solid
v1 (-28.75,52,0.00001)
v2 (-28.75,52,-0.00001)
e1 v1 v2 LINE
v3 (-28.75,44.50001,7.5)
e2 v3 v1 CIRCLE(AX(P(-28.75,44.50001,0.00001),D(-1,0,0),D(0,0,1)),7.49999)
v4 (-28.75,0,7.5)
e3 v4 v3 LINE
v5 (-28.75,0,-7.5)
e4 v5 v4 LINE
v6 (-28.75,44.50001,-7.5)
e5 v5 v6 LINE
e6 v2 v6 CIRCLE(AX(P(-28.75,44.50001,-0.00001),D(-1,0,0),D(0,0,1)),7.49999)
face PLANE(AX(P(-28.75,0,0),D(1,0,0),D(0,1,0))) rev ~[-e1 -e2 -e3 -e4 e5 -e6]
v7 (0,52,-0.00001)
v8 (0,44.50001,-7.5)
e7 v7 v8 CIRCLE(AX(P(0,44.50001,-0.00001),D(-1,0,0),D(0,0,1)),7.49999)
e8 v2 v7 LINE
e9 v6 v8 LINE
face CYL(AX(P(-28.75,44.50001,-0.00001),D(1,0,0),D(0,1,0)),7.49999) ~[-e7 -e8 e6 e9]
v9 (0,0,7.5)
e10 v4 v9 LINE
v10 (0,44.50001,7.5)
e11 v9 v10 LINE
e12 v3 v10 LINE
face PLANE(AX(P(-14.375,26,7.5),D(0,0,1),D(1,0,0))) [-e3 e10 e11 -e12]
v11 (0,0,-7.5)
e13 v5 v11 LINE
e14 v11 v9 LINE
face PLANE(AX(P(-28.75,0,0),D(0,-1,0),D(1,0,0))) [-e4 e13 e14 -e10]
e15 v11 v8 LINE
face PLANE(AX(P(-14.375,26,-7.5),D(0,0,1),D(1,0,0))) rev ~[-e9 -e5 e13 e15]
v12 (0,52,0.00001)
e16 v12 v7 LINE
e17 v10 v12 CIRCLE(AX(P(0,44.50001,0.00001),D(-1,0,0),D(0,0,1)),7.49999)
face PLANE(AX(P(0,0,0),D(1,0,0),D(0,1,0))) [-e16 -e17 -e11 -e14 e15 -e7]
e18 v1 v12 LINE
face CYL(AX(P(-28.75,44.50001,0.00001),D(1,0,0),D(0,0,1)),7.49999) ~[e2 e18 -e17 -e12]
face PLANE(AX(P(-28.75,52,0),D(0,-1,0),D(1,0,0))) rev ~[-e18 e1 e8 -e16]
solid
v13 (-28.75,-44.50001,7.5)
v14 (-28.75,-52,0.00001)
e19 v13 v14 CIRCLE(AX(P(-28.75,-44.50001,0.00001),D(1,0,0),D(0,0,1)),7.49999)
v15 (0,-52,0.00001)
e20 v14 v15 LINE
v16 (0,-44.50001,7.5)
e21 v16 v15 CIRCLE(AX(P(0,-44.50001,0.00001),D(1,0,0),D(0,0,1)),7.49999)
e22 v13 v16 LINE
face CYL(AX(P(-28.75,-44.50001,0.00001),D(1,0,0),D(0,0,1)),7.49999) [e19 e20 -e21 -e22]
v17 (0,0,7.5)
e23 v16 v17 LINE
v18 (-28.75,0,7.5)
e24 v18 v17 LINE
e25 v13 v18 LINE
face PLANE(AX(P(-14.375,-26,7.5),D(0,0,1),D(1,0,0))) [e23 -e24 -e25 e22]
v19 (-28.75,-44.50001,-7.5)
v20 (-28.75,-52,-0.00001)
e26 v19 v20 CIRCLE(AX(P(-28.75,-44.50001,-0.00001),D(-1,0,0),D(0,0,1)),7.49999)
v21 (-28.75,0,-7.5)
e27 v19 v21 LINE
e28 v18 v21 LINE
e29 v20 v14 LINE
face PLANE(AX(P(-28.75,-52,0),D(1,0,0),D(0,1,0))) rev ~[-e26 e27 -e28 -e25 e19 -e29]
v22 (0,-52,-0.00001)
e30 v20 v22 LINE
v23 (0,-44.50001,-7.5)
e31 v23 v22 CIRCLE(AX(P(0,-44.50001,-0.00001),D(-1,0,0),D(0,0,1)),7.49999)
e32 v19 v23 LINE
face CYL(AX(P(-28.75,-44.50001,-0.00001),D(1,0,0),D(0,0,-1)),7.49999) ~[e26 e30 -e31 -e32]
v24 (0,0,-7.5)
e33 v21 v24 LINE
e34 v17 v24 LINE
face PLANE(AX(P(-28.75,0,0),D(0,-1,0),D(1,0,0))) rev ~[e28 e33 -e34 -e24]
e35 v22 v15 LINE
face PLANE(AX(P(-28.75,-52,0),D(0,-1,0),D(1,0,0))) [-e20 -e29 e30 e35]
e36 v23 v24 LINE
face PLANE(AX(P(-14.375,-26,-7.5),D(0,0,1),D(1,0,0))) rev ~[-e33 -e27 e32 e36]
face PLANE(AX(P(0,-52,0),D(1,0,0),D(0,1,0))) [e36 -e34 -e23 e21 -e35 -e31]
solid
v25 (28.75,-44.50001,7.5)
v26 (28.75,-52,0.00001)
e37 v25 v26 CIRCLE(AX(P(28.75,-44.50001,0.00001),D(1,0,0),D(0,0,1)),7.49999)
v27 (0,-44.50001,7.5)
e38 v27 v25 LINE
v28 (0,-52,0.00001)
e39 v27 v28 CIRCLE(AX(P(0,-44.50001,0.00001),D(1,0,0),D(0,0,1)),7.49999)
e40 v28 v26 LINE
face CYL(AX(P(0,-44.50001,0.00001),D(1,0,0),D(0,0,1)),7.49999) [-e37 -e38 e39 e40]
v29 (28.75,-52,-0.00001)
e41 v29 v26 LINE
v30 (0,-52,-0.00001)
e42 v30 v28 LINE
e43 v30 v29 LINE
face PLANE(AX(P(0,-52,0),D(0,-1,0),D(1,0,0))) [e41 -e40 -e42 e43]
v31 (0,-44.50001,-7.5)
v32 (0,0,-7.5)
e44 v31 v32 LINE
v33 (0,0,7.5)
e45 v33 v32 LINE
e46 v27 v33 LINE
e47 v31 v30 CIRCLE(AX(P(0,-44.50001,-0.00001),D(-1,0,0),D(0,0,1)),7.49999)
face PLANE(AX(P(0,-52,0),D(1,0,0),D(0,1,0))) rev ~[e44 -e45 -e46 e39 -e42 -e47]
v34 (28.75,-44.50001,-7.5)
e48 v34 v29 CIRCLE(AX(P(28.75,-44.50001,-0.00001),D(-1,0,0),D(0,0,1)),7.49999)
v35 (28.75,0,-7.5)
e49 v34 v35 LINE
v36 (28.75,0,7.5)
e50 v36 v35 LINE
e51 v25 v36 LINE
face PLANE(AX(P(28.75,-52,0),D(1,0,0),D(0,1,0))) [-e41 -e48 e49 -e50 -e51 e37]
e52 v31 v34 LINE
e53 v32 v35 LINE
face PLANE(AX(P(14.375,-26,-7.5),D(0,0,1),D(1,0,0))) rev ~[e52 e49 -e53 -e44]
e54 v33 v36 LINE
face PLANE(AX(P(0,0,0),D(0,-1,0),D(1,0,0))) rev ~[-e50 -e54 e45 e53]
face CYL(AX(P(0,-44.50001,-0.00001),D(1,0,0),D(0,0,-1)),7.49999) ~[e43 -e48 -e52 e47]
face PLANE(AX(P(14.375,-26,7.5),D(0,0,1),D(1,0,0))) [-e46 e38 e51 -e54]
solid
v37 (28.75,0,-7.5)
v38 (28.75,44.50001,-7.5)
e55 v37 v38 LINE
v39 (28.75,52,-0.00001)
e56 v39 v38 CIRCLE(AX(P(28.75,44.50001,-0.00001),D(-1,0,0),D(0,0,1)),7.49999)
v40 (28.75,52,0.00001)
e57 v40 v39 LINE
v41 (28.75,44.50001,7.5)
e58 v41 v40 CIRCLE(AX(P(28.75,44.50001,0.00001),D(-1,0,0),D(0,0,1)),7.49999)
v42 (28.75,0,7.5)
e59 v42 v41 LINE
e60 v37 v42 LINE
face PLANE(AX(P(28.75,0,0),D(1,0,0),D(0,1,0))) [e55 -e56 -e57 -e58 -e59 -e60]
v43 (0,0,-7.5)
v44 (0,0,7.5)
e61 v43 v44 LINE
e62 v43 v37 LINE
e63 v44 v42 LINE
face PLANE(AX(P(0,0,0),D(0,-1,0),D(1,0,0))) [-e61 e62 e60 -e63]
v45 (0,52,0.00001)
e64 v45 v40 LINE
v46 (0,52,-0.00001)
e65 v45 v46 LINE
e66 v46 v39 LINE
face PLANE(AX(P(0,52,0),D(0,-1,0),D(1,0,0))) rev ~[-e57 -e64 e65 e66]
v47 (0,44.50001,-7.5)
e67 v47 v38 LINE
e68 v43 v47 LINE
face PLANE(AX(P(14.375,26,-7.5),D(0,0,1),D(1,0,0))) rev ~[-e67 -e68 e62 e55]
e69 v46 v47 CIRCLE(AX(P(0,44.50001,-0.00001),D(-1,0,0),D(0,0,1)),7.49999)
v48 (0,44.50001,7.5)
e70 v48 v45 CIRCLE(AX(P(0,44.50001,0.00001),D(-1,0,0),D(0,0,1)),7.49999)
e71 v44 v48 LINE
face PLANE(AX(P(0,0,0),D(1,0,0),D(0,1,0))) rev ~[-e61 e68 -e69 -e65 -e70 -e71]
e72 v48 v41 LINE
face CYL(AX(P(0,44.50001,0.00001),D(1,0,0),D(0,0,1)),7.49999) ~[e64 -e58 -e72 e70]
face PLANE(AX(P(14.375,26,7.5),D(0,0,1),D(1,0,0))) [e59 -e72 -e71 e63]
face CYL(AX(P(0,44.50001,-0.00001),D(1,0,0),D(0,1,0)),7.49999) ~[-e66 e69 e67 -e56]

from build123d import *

# Parameters (mm, degrees)
F0_W     = 28.75
F0_H     = 52
F1_DEPTH = 7.5
F2_DEPTH = 7.5
F3_R     = 7.49999
F3_2_R   = 7.49999
F3_3_R   = 7.49999
F3_4_R   = 7.49999


# Not quite as in the source:
# - a fillet or chamfer is up to 0.001 mm smaller than in the source, because OpenCascade refuses the exact size


with BuildPart() as f1:
    # F0 (on Top) → F1 (new body, symmetric)
    with BuildSketch(Plane.XY):
        with Locations((-14.375, 26)):
            Rectangle(F0_W, F0_H)
    extrude(amount=F1_DEPTH, both=True)

    # F3 (radius 7.5 in the source; OpenCascade refuses exactly that, so slightly less here)
    f3_edges = [f1.edges().sort_by_distance(p)[0] for p in [
        (-14.375, 52, 7.5),
        (-14.375, 52, -7.5),
    ]]
    fillet(f3_edges, radius=F3_R)


with BuildPart() as f1b:
    # F0 (on Top) → F1, piece 2 (new body, symmetric)
    with BuildSketch(Plane.XY):
        with Locations((14.375, -26)):
            Rectangle(F0_W, F0_H)
    extrude(amount=F1_DEPTH, both=True)

    # F3#3 (radius 7.5 in the source; OpenCascade refuses exactly that, so slightly less here)
    f3_3_edges = [f1b.edges().sort_by_distance(p)[0] for p in [
        (14.375, -52, 7.5),
        (14.375, -52, -7.5),
    ]]
    fillet(f3_3_edges, radius=F3_3_R)


with BuildPart() as f2:
    # F0 (on Top) → F2 (new body, symmetric)
    with BuildSketch(Plane.XY):
        with Locations((14.375, 26)):
            Rectangle(F0_W, F0_H)
    extrude(amount=F2_DEPTH, both=True)

    # F3#2 (radius 7.5 in the source; OpenCascade refuses exactly that, so slightly less here)
    f3_2_edges = [f2.edges().sort_by_distance(p)[0] for p in [
        (14.375, 52, 7.5),
        (14.375, 52, -7.5),
    ]]
    fillet(f3_2_edges, radius=F3_2_R)


with BuildPart() as f2b:
    # F0 (on Top) → F2, piece 2 (new body, symmetric)
    with BuildSketch(Plane.XY):
        with Locations((-14.375, -26)):
            Rectangle(F0_W, F0_H)
    extrude(amount=F2_DEPTH, both=True)

    # F3#4 (radius 7.5 in the source; OpenCascade refuses exactly that, so slightly less here)
    f3_4_edges = [f2b.edges().sort_by_distance(p)[0] for p in [
        (-14.375, -52, 7.5),
        (-14.375, -52, -7.5),
    ]]
    fillet(f3_4_edges, radius=F3_4_R)


solid = Compound([f1.part, f1b.part, f2.part, f2b.part])
